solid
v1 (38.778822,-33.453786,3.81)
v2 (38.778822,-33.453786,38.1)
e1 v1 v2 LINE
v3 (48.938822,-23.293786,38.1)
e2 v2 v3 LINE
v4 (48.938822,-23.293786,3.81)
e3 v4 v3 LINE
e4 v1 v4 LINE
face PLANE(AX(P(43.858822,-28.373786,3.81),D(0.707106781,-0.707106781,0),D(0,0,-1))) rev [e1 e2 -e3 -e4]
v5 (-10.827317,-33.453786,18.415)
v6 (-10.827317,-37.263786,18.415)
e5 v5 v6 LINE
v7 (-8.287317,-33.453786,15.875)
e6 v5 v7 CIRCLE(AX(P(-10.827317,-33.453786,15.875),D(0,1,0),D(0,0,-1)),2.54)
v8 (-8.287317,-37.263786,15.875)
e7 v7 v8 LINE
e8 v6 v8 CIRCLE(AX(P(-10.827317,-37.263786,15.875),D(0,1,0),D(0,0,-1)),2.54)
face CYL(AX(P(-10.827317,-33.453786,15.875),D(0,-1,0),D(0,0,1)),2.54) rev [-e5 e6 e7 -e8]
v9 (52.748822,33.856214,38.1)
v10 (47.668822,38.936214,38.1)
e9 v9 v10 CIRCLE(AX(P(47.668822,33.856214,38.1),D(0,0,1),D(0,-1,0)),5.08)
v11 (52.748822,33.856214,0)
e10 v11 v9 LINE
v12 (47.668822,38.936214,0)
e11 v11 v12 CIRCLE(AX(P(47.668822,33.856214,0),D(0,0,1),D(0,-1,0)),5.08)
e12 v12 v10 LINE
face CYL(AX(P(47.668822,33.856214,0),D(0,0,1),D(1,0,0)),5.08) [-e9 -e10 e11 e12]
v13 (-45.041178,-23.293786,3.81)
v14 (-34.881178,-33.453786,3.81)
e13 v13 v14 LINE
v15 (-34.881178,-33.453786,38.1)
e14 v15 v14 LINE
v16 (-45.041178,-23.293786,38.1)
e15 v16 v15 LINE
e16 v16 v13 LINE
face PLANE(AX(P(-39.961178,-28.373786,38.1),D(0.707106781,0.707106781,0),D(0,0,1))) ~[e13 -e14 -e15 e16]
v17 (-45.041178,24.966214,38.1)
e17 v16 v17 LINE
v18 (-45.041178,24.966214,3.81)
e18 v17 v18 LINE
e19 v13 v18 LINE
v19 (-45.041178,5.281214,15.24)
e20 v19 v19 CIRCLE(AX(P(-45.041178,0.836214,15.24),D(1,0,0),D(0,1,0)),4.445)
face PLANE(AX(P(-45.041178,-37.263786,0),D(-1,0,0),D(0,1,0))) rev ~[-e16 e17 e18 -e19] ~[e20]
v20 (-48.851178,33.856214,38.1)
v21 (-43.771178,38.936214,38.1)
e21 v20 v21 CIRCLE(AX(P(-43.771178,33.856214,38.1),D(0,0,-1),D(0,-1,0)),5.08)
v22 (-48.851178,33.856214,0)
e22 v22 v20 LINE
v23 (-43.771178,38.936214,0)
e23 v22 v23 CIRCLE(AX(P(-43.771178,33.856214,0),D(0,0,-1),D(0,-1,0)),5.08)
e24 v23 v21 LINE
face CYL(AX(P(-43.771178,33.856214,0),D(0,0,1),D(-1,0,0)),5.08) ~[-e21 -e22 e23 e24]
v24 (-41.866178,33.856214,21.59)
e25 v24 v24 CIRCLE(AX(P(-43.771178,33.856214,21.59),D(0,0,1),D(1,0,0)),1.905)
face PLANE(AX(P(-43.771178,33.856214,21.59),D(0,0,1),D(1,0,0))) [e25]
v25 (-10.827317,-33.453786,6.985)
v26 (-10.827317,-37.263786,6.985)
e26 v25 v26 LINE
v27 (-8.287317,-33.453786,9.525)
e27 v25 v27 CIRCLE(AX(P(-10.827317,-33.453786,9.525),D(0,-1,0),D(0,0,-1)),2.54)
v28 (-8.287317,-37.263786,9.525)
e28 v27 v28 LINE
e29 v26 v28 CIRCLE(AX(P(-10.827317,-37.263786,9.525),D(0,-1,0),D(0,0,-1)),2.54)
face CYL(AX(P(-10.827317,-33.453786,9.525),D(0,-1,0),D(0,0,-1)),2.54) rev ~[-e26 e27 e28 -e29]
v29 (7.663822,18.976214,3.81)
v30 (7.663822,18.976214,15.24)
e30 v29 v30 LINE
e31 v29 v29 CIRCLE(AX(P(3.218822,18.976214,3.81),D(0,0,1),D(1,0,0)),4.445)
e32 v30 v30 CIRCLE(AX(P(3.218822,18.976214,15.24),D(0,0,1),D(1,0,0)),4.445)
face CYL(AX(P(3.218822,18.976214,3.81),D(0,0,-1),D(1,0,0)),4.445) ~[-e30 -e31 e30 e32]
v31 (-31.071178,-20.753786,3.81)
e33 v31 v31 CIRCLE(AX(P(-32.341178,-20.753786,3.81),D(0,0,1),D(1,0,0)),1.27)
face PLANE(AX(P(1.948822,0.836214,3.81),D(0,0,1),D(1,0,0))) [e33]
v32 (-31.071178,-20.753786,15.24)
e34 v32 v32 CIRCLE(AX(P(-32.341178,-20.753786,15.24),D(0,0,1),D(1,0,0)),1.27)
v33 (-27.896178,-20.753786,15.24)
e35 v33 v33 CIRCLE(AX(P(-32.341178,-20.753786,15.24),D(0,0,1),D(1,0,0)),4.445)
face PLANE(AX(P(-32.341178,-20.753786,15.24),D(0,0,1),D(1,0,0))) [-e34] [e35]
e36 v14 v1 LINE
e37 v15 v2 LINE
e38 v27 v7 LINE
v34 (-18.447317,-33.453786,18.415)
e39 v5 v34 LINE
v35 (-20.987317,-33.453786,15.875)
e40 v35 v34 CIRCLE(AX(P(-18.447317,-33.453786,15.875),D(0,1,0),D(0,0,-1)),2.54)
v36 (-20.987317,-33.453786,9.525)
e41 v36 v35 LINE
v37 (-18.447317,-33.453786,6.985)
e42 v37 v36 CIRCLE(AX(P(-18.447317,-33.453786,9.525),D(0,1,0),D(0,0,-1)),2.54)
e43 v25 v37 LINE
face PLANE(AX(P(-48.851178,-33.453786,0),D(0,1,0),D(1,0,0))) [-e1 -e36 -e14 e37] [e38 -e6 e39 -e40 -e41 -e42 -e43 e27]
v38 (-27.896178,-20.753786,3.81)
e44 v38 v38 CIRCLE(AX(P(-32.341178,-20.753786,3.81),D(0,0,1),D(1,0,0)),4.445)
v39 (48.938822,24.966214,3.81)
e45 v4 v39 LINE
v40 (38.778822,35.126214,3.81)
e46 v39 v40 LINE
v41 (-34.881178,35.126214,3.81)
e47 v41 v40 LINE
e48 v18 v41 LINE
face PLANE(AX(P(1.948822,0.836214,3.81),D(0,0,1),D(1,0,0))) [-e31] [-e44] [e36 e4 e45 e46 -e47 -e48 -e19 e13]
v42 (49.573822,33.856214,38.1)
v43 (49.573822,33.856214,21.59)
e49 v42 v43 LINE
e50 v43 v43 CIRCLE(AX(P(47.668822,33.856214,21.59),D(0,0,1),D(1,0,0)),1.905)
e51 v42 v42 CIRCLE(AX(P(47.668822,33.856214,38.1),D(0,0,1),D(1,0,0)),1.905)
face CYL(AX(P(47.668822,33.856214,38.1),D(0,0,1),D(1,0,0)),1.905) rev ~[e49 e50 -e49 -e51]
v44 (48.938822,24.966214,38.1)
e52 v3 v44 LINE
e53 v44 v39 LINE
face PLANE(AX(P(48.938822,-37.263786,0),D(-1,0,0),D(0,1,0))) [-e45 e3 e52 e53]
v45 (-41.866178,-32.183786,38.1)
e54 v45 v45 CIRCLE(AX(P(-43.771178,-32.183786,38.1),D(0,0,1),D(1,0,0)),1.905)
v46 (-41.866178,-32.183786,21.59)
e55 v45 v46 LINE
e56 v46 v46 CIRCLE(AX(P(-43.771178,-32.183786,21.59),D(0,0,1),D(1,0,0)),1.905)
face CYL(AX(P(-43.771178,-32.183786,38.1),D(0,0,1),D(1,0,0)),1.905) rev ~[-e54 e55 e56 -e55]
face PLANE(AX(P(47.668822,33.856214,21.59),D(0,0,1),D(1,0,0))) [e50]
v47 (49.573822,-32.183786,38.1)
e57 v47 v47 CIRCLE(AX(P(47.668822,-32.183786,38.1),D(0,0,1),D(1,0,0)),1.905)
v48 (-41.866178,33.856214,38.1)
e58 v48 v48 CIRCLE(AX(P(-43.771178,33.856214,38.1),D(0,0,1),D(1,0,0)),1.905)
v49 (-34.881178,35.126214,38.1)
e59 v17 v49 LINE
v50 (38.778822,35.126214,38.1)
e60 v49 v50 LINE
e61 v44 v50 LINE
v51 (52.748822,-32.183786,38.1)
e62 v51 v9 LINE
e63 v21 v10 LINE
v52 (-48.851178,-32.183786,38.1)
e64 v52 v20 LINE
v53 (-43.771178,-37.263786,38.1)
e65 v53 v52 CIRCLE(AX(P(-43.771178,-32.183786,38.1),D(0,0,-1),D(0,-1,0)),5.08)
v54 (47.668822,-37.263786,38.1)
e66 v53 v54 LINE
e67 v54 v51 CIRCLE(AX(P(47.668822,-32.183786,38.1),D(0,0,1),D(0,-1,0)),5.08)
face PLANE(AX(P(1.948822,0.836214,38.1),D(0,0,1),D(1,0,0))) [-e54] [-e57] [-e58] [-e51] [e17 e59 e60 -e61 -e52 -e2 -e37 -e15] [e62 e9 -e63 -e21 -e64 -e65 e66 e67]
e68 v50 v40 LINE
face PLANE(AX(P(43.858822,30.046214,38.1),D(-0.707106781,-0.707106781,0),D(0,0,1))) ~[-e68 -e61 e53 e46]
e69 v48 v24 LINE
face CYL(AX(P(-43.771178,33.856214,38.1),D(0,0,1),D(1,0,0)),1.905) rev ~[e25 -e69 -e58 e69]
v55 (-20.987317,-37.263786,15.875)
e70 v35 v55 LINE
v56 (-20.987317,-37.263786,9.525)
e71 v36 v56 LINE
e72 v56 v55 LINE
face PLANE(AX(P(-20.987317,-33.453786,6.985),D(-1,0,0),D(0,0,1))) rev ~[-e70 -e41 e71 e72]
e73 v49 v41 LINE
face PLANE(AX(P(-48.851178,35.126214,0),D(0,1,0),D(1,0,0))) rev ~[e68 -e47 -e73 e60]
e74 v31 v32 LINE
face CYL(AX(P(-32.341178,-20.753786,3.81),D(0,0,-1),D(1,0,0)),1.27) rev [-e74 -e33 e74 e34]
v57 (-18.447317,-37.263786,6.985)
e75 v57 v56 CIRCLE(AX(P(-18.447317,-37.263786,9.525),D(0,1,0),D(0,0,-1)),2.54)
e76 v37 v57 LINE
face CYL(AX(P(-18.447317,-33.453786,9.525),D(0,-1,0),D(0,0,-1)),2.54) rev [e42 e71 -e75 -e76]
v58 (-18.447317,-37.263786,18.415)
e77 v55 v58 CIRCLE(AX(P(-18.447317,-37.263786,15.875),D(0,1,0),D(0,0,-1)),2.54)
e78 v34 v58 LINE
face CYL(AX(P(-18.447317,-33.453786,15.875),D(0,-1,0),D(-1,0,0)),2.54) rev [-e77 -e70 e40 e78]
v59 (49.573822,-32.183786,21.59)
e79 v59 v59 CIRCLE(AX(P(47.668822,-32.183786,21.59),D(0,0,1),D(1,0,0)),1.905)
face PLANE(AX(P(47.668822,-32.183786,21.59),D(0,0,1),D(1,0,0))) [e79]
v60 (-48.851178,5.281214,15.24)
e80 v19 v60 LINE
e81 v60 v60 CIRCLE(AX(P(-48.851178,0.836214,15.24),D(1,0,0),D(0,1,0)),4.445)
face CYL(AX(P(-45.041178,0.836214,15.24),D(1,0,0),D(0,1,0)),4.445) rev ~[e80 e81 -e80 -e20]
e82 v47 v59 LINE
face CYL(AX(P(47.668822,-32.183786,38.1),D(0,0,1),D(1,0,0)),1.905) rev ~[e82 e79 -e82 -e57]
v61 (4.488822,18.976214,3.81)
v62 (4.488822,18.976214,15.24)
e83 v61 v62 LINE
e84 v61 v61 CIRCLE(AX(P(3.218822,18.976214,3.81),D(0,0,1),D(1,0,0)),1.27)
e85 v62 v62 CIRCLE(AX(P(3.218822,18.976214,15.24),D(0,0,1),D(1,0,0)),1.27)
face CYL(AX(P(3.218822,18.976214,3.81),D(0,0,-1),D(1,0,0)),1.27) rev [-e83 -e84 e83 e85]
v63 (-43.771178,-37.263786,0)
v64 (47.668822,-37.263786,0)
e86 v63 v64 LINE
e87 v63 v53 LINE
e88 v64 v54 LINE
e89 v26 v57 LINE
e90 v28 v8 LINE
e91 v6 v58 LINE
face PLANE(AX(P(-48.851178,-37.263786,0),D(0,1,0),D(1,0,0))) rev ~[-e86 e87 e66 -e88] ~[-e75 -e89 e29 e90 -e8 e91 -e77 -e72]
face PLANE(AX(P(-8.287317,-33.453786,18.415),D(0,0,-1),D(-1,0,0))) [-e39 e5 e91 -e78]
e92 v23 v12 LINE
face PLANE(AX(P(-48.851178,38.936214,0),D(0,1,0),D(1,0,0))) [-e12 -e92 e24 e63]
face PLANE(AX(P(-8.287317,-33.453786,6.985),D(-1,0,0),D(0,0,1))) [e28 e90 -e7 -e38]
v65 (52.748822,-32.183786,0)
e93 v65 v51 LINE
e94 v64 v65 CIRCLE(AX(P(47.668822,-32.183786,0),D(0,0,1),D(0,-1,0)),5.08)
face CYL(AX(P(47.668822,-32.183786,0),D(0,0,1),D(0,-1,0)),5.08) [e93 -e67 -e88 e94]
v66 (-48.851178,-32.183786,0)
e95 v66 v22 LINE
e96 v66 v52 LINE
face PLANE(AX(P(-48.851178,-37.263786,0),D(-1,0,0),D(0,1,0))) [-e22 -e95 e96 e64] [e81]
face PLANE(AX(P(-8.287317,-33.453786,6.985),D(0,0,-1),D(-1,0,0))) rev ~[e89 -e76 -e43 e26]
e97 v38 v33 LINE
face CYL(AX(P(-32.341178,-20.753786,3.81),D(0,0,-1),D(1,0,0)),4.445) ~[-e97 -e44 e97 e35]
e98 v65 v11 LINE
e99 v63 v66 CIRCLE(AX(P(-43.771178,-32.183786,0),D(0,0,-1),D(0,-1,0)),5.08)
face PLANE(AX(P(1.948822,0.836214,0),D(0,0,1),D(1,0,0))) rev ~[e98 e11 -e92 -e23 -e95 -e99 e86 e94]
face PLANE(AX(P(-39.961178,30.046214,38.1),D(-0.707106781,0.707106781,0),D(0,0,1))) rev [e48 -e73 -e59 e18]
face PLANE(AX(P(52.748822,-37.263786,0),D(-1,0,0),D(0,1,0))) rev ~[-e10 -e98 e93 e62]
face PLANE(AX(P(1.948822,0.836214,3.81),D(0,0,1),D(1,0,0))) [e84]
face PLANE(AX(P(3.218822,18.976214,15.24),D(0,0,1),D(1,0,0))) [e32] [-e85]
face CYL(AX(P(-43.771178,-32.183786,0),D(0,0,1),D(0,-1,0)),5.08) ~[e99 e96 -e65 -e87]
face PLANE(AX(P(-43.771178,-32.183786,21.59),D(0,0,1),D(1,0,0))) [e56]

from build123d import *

# Parameters (mm, degrees)
F0_W      = 101.6
F0_H      = 76.2
F1_DEPTH  = 38.1
F2_T      = -3.81
F3_SIZE   = 10.16
F4_R      = 4.445
F4_R_2    = 1.27
F6_DEPTH  = 11.43
F5_R      = 4.445
F7_DEPTH  = 3.81
F8_W      = 12.7
F8_H      = 11.43
F9_DEPTH  = 3.81
F10_R     = 2.54
F11_R     = 5.08
F12_R     = 1.905
F13_DEPTH = 16.51


with BuildPart() as f1:
    # F0 (on Top) → F1 (new body)
    with BuildSketch(Plane.XY):
        with Locations((1.9488222897, 0.8362135466)):
            Rectangle(F0_W, F0_H)
    extrude(amount=F1_DEPTH)

    # F2
    f2_openings = [f1.faces().sort_by_distance(p)[0] for p in [
        (1.948822, 0.836214, 38.1),
    ]]
    offset(amount=F2_T, openings=f2_openings)

    # F3
    f3_edges = [f1.edges().sort_by_distance(p)[0] for p in [
        (-45.041178, 35.126214, 20.955),
        (48.938822, 35.126214, 20.955),
        (48.938822, -33.453786, 20.955),
        (-45.041178, -33.453786, 20.955),
    ]]
    chamfer(f3_edges, length=F3_SIZE)

    # F4 (on face) → F6 (join)
    with BuildSketch(Plane.XY.offset(3.81)):
        with Locations((-32.3411777103, -20.7537864534)):
            Circle(F4_R)
        with Locations((-32.3411777103, -20.7537864534)):
            Circle(F4_R_2, mode=Mode.SUBTRACT)
        with Locations((3.2188222897, 18.9762135466)):
            Circle(F4_R)
        with Locations((3.2188222897, 18.9762135466)):
            Circle(F4_R_2, mode=Mode.SUBTRACT)
    extrude(amount=F6_DEPTH)

    # F5 (on face) → F7 (cut, through all)
    with BuildSketch(Plane.YZ.offset(-45.0411777103)):
        with Locations((0.8362135466, 15.24)):
            Circle(F5_R)
    extrude(amount=-F7_DEPTH, mode=Mode.SUBTRACT)

    # F8 (on face) → F9 (cut, through all)
    with BuildSketch(Plane(origin=(0, -33.4537864534, 0), x_dir=(-1, 0, 0), z_dir=(0, 1, 0))):
        with Locations((14.6373170428, 12.7)):
            Rectangle(F8_W, F8_H)
    extrude(amount=-F9_DEPTH, mode=Mode.SUBTRACT)

    # F10
    f10_edges = [f1.edges().sort_by_distance(p)[0] for p in [
        (-8.287317, -35.358786, 6.985),
        (-20.987317, -35.358786, 6.985),
        (-20.987317, -35.358786, 18.415),
        (-8.287317, -35.358786, 18.415),
    ]]
    fillet(f10_edges, radius=F10_R)

    # F11
    f11_edges = [f1.edges().sort_by_distance(p)[0] for p in [
        (-48.851178, -37.263786, 19.05),
        (52.748822, -37.263786, 19.05),
        (52.748822, 38.936214, 19.05),
        (-48.851178, 38.936214, 19.05),
    ]]
    fillet(f11_edges, radius=F11_R)

    # F12 (on face) → F13 (cut)
    with BuildSketch(Plane.XY.offset(38.1)):
        with Locations((-43.7711777103, 33.8562135466)):
            Circle(F12_R)
        with Locations((-43.7711777103, -32.1837864534)):
            Circle(F12_R)
        with Locations((47.6688222897, 33.8562135466)):
            Circle(F12_R)
        with Locations((47.6688222897, -32.1837864534)):
            Circle(F12_R)
        with Locations((139.1088222897, 33.8562135466)):
            Circle(F12_R)
        with Locations((139.1088222897, -32.1837864534)):
            Circle(F12_R)
    extrude(amount=-F13_DEPTH, mode=Mode.SUBTRACT)


solid = f1.part
